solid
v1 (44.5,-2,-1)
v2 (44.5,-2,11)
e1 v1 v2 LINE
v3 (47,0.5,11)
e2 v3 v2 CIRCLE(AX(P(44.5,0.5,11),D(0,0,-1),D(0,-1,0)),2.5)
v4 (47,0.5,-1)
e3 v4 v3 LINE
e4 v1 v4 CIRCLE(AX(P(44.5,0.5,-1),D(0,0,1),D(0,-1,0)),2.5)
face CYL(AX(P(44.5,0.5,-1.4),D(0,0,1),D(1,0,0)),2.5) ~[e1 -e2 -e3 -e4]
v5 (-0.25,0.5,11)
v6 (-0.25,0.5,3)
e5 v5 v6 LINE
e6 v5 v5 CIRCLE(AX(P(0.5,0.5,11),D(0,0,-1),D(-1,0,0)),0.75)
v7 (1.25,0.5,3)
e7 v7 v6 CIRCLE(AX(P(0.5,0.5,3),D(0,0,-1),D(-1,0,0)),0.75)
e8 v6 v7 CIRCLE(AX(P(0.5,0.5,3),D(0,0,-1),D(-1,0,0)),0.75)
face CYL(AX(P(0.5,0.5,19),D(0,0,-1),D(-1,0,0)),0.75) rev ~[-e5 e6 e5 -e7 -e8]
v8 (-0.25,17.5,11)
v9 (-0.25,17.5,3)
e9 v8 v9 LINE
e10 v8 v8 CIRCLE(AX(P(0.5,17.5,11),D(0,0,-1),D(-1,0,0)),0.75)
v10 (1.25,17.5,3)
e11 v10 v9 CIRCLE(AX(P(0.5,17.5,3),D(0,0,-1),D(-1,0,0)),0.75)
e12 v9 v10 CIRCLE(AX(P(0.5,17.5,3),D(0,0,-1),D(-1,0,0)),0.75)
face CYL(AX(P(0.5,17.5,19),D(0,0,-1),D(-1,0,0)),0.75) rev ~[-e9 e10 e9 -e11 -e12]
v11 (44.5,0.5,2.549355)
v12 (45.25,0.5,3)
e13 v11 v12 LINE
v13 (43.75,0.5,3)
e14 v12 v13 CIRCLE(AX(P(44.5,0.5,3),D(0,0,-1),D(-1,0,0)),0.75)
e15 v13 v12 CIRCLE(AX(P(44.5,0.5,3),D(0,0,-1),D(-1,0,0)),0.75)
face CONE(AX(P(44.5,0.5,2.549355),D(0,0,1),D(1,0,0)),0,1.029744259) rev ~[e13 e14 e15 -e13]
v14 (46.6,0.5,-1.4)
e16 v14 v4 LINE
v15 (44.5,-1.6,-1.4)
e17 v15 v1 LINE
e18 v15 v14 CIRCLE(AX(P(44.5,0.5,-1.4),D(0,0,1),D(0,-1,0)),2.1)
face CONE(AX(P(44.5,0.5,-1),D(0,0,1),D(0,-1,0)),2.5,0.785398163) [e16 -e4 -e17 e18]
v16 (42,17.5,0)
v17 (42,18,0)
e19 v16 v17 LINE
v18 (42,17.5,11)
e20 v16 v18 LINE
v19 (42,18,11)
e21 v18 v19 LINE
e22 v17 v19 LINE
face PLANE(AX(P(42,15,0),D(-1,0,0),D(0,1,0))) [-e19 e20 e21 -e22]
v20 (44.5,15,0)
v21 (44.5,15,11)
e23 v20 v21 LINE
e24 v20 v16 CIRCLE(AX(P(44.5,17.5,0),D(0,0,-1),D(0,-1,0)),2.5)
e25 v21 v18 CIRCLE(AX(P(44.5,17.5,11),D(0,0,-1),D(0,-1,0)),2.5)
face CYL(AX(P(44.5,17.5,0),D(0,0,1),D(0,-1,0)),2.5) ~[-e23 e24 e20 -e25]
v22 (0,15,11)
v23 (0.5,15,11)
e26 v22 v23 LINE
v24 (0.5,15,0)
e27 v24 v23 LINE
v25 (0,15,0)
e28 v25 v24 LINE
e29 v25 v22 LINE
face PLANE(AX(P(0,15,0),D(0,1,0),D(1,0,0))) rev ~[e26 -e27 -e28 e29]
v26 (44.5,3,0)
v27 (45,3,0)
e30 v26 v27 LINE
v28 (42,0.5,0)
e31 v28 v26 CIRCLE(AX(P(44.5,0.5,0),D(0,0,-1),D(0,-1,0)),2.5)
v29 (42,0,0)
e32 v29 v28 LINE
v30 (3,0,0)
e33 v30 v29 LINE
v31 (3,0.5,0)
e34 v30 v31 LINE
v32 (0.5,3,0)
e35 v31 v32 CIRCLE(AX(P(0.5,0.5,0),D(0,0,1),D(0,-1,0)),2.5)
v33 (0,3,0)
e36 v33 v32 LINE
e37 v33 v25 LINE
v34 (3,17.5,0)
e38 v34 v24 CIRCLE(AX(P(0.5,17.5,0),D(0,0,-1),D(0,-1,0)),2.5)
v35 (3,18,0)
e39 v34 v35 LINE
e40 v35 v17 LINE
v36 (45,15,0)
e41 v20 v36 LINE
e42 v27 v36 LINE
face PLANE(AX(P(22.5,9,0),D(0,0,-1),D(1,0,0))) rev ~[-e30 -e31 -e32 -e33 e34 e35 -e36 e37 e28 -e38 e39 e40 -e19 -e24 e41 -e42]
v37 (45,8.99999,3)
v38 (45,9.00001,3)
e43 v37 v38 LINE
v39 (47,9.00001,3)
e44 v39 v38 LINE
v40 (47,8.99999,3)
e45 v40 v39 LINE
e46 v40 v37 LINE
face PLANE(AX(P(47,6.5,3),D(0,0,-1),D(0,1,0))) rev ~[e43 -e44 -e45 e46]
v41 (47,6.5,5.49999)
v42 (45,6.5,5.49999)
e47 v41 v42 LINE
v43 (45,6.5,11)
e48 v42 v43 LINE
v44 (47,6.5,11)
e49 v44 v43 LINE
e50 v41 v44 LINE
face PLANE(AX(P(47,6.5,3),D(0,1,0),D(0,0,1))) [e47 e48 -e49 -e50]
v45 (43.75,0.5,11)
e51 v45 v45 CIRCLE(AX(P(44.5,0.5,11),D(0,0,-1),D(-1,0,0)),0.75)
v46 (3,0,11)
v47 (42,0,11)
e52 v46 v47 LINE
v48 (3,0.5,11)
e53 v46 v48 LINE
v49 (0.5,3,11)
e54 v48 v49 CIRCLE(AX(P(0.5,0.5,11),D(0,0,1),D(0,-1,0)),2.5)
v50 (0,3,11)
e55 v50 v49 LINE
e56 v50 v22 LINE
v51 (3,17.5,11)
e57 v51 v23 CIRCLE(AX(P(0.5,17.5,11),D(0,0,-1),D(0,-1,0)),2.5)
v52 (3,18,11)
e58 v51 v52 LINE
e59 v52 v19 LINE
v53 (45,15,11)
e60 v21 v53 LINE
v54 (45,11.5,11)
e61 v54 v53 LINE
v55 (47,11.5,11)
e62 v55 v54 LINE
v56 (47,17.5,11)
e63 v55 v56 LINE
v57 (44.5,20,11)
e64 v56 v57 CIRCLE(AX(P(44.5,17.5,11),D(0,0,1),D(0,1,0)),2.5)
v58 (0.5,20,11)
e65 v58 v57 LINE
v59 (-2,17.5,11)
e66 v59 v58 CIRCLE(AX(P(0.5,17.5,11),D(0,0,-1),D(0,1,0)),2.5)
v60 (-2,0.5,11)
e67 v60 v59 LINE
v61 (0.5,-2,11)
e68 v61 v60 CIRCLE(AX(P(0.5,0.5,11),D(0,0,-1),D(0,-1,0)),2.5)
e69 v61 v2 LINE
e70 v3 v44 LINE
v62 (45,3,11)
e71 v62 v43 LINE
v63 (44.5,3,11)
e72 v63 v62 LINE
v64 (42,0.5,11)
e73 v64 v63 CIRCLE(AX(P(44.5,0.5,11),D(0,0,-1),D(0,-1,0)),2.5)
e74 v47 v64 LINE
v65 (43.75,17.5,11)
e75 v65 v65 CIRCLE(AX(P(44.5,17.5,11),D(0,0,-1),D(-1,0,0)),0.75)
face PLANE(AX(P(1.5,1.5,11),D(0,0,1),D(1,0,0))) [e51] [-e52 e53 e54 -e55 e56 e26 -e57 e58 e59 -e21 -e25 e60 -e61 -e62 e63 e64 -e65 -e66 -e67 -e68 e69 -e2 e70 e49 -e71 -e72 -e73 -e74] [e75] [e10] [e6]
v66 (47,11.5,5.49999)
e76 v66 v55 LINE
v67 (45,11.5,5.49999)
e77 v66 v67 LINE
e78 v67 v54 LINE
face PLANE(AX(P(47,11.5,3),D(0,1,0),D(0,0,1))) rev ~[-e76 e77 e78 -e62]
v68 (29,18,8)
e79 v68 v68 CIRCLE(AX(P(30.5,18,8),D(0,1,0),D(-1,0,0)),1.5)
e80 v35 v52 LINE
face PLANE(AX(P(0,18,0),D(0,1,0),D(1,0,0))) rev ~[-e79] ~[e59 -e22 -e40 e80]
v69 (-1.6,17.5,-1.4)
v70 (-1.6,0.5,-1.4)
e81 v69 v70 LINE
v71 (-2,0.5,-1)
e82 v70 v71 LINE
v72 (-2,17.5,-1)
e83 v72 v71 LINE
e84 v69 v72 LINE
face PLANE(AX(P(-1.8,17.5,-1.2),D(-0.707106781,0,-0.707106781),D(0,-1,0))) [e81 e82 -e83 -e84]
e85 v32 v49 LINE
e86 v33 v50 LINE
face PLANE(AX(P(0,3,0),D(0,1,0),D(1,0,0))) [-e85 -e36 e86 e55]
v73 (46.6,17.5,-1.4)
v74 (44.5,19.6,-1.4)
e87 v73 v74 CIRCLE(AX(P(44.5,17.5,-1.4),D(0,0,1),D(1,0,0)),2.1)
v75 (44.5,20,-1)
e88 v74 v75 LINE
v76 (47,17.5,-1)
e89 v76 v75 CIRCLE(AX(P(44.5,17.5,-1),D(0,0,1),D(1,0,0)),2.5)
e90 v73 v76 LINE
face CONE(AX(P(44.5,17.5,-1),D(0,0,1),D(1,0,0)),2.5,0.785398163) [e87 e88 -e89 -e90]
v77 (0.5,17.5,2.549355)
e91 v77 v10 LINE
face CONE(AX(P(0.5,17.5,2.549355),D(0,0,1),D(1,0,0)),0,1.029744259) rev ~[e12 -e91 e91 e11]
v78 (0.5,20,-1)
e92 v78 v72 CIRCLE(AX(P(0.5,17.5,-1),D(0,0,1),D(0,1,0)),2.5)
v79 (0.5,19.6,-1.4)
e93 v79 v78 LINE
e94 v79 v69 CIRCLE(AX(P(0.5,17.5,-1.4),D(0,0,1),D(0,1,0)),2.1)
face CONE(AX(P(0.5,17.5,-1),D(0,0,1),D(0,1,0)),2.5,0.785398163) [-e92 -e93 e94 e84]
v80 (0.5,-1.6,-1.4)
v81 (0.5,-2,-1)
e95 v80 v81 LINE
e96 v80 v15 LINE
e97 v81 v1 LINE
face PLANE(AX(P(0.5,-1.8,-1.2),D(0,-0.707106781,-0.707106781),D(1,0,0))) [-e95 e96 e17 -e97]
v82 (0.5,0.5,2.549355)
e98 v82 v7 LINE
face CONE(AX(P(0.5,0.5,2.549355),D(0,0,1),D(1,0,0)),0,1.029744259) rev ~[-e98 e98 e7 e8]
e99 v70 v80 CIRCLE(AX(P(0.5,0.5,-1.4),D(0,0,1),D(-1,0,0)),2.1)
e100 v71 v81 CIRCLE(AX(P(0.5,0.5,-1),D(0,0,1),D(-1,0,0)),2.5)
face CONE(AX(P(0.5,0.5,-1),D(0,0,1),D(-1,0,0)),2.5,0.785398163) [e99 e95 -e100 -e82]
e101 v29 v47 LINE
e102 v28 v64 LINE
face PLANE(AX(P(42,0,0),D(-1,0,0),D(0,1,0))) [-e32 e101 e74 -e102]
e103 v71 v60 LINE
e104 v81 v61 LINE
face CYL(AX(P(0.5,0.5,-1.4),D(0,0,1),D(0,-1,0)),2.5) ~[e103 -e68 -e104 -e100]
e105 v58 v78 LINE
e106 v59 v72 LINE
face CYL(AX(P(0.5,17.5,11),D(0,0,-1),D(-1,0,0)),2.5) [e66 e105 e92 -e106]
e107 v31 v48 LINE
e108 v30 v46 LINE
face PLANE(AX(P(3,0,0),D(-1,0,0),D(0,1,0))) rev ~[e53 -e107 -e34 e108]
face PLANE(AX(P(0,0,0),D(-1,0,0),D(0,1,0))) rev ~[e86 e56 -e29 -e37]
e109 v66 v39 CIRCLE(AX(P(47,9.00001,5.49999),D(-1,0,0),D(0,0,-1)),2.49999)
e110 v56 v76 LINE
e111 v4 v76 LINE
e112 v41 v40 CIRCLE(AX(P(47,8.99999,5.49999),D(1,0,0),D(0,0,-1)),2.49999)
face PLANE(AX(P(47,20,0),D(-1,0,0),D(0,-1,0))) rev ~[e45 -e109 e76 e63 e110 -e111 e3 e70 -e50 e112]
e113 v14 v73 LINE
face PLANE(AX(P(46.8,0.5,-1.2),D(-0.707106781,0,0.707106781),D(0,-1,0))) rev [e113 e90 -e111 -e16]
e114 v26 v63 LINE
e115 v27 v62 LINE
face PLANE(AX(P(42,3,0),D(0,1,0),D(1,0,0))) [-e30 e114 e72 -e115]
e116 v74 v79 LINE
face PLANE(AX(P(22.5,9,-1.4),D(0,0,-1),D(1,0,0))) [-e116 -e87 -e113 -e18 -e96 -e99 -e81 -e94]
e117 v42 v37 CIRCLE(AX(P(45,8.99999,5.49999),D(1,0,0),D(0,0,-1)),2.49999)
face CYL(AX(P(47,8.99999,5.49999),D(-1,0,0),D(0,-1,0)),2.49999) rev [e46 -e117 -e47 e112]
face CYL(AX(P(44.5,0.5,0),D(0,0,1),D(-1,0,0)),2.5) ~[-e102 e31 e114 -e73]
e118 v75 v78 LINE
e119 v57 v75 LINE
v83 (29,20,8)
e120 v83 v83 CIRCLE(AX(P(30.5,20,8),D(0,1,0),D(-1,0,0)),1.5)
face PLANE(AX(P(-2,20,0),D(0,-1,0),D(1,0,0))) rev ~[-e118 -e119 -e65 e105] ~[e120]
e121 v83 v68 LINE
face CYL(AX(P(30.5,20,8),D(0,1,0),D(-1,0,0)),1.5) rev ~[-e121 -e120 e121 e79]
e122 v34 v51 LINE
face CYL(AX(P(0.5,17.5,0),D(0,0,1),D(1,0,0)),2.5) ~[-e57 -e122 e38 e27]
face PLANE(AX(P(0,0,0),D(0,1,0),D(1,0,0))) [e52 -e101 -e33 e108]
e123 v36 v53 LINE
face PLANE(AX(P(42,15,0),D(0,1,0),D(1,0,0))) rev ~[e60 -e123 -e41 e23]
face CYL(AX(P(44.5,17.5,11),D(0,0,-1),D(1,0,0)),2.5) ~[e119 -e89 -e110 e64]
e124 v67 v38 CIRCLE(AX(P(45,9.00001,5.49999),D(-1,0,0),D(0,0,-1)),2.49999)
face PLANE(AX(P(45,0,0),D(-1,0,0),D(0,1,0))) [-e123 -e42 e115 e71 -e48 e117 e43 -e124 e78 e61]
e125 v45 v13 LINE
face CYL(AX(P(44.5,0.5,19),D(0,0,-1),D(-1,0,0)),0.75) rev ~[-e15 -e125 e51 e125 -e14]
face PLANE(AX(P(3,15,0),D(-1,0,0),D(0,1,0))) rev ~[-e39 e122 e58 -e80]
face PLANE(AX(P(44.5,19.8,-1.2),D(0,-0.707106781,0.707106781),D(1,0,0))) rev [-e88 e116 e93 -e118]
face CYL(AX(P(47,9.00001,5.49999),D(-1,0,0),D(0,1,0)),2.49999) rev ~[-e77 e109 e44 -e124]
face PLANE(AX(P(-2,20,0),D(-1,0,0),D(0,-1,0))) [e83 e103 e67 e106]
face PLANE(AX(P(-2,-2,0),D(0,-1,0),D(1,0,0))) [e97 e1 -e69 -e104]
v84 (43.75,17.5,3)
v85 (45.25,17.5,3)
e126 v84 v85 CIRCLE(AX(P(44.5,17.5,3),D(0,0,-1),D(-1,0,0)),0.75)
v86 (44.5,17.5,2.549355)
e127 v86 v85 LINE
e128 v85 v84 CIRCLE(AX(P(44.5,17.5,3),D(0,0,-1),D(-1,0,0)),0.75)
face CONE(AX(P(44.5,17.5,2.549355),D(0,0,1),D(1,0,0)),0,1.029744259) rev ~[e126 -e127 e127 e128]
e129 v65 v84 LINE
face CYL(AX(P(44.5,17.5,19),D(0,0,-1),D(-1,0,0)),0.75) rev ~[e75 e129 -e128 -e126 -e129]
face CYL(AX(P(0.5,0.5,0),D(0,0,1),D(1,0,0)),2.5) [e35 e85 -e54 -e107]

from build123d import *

# Parameters (mm, degrees)
F0_W      = 49
F0_H      = 22
F0_W_2    = 45
F0_H_2    = 18
F1_DEPTH  = 11
F2_W      = 49
F2_H      = 22
F3_DEPTH  = 1.4
F4_W      = 5
F4_H      = 8
F5_DEPTH  = 2
F6_R      = 1.5
F7_DEPTH  = 2
F8_W      = 3
F8_H      = 3
F9_DEPTH  = 11
F10_R     = 2.5
F11_R     = 2.5
F12_R     = 2.49999
F14_D     = 1.5
F14_DEPTH = 8
F14_TIP   = 0.4506454643
F15_SIZE  = 0.4


# Not quite as in the source:
# - a fillet or chamfer is up to 0.001 mm smaller than in the source, because OpenCascade refuses the exact size


with BuildPart() as f1:
    # F0 (on Top) → F1 (new body)
    with BuildSketch(Plane.XY):
        with Locations((22.5, 9)):
            Rectangle(F0_W, F0_H)
        with Locations((22.5, 9)):
            Rectangle(F0_W_2, F0_H_2, mode=Mode.SUBTRACT)
    extrude(amount=F1_DEPTH)

    # F2 (on face) → F3 (join)
    with BuildSketch(Plane(origin=(0, 0, 0), x_dir=(1, 0, 0), z_dir=(0, 0, -1))):
        with Locations((22.5, -9)):
            Rectangle(F2_W, F2_H)
    extrude(amount=F3_DEPTH)

    # F4 (on face) → F5 (cut, through all)
    with BuildSketch(Plane.YZ.offset(47)):
        with Locations((9, 7)):
            Rectangle(F4_W, F4_H)
    extrude(amount=-F5_DEPTH, mode=Mode.SUBTRACT)

    # F6 (on face) → F7 (cut, through all)
    with BuildSketch(Plane(origin=(0, 20, 0), x_dir=(-1, 0, 0), z_dir=(0, 1, 0))):
        with Locations((-30.5, 8)):
            Circle(F6_R)
    extrude(amount=-F7_DEPTH, mode=Mode.SUBTRACT)

    # F8 (on face) → F9 (join, through all)
    with BuildSketch(Plane.XY):
        with Locations((1.5, 1.5)):
            Rectangle(F8_W, F8_H)
        with Locations((43.5, 1.5)):
            Rectangle(F8_W, F8_H)
        with Locations((1.5, 16.5)):
            Rectangle(F8_W, F8_H)
        with Locations((43.5, 16.5)):
            Rectangle(F8_W, F8_H)
    extrude(amount=F9_DEPTH)

    # F10
    f10_edges = [f1.edges().sort_by_distance(p)[0] for p in [
        (42, 3, 5.5),
        (42, 15, 5.5),
        (3, 3, 5.5),
        (3, 15, 5.5),
    ]]
    fillet(f10_edges, radius=F10_R)

    # F11
    f11_edges = [f1.edges().sort_by_distance(p)[0] for p in [
        (47, -2, 4.8),
        (47, 20, 4.8),
        (-2, 20, 4.8),
        (-2, -2, 4.8),
    ]]
    fillet(f11_edges, radius=F11_R)

    # F12 (radius 2.5 in the source; OpenCascade refuses exactly that, so slightly less here)
    f12_edges = [f1.edges().sort_by_distance(p)[0] for p in [
        (46, 11.5, 3),
        (46, 6.5, 3),
    ]]
    fillet(f12_edges, radius=F12_R)

    # F14
    with Locations(Plane.XY.offset(11)):
        with Locations((44.5, 17.5), (44.5, 0.5), (0.5, 0.5), (0.5, 17.5)):
            Hole(F14_D / 2, depth=F14_DEPTH)
            with Locations((0, 0, -(F14_DEPTH + F14_TIP / 2))):  # 118° drill point
                Cone(0, F14_D / 2, F14_TIP, mode=Mode.SUBTRACT)

    # F15
    f15_edges = [f1.edges().sort_by_distance(p)[0] for p in [
        (-2, 9, -1.4),
        (-1.267767, -1.267767, -1.4),
        (-1.267767, 19.267767, -1.4),
        (22.5, -2, -1.4),
        (22.5, 20, -1.4),
        (46.267767, -1.267767, -1.4),
        (46.267767, 19.267767, -1.4),
        (47, 9, -1.4),
    ]]
    chamfer(f15_edges, length=F15_SIZE)


solid = f1.part
